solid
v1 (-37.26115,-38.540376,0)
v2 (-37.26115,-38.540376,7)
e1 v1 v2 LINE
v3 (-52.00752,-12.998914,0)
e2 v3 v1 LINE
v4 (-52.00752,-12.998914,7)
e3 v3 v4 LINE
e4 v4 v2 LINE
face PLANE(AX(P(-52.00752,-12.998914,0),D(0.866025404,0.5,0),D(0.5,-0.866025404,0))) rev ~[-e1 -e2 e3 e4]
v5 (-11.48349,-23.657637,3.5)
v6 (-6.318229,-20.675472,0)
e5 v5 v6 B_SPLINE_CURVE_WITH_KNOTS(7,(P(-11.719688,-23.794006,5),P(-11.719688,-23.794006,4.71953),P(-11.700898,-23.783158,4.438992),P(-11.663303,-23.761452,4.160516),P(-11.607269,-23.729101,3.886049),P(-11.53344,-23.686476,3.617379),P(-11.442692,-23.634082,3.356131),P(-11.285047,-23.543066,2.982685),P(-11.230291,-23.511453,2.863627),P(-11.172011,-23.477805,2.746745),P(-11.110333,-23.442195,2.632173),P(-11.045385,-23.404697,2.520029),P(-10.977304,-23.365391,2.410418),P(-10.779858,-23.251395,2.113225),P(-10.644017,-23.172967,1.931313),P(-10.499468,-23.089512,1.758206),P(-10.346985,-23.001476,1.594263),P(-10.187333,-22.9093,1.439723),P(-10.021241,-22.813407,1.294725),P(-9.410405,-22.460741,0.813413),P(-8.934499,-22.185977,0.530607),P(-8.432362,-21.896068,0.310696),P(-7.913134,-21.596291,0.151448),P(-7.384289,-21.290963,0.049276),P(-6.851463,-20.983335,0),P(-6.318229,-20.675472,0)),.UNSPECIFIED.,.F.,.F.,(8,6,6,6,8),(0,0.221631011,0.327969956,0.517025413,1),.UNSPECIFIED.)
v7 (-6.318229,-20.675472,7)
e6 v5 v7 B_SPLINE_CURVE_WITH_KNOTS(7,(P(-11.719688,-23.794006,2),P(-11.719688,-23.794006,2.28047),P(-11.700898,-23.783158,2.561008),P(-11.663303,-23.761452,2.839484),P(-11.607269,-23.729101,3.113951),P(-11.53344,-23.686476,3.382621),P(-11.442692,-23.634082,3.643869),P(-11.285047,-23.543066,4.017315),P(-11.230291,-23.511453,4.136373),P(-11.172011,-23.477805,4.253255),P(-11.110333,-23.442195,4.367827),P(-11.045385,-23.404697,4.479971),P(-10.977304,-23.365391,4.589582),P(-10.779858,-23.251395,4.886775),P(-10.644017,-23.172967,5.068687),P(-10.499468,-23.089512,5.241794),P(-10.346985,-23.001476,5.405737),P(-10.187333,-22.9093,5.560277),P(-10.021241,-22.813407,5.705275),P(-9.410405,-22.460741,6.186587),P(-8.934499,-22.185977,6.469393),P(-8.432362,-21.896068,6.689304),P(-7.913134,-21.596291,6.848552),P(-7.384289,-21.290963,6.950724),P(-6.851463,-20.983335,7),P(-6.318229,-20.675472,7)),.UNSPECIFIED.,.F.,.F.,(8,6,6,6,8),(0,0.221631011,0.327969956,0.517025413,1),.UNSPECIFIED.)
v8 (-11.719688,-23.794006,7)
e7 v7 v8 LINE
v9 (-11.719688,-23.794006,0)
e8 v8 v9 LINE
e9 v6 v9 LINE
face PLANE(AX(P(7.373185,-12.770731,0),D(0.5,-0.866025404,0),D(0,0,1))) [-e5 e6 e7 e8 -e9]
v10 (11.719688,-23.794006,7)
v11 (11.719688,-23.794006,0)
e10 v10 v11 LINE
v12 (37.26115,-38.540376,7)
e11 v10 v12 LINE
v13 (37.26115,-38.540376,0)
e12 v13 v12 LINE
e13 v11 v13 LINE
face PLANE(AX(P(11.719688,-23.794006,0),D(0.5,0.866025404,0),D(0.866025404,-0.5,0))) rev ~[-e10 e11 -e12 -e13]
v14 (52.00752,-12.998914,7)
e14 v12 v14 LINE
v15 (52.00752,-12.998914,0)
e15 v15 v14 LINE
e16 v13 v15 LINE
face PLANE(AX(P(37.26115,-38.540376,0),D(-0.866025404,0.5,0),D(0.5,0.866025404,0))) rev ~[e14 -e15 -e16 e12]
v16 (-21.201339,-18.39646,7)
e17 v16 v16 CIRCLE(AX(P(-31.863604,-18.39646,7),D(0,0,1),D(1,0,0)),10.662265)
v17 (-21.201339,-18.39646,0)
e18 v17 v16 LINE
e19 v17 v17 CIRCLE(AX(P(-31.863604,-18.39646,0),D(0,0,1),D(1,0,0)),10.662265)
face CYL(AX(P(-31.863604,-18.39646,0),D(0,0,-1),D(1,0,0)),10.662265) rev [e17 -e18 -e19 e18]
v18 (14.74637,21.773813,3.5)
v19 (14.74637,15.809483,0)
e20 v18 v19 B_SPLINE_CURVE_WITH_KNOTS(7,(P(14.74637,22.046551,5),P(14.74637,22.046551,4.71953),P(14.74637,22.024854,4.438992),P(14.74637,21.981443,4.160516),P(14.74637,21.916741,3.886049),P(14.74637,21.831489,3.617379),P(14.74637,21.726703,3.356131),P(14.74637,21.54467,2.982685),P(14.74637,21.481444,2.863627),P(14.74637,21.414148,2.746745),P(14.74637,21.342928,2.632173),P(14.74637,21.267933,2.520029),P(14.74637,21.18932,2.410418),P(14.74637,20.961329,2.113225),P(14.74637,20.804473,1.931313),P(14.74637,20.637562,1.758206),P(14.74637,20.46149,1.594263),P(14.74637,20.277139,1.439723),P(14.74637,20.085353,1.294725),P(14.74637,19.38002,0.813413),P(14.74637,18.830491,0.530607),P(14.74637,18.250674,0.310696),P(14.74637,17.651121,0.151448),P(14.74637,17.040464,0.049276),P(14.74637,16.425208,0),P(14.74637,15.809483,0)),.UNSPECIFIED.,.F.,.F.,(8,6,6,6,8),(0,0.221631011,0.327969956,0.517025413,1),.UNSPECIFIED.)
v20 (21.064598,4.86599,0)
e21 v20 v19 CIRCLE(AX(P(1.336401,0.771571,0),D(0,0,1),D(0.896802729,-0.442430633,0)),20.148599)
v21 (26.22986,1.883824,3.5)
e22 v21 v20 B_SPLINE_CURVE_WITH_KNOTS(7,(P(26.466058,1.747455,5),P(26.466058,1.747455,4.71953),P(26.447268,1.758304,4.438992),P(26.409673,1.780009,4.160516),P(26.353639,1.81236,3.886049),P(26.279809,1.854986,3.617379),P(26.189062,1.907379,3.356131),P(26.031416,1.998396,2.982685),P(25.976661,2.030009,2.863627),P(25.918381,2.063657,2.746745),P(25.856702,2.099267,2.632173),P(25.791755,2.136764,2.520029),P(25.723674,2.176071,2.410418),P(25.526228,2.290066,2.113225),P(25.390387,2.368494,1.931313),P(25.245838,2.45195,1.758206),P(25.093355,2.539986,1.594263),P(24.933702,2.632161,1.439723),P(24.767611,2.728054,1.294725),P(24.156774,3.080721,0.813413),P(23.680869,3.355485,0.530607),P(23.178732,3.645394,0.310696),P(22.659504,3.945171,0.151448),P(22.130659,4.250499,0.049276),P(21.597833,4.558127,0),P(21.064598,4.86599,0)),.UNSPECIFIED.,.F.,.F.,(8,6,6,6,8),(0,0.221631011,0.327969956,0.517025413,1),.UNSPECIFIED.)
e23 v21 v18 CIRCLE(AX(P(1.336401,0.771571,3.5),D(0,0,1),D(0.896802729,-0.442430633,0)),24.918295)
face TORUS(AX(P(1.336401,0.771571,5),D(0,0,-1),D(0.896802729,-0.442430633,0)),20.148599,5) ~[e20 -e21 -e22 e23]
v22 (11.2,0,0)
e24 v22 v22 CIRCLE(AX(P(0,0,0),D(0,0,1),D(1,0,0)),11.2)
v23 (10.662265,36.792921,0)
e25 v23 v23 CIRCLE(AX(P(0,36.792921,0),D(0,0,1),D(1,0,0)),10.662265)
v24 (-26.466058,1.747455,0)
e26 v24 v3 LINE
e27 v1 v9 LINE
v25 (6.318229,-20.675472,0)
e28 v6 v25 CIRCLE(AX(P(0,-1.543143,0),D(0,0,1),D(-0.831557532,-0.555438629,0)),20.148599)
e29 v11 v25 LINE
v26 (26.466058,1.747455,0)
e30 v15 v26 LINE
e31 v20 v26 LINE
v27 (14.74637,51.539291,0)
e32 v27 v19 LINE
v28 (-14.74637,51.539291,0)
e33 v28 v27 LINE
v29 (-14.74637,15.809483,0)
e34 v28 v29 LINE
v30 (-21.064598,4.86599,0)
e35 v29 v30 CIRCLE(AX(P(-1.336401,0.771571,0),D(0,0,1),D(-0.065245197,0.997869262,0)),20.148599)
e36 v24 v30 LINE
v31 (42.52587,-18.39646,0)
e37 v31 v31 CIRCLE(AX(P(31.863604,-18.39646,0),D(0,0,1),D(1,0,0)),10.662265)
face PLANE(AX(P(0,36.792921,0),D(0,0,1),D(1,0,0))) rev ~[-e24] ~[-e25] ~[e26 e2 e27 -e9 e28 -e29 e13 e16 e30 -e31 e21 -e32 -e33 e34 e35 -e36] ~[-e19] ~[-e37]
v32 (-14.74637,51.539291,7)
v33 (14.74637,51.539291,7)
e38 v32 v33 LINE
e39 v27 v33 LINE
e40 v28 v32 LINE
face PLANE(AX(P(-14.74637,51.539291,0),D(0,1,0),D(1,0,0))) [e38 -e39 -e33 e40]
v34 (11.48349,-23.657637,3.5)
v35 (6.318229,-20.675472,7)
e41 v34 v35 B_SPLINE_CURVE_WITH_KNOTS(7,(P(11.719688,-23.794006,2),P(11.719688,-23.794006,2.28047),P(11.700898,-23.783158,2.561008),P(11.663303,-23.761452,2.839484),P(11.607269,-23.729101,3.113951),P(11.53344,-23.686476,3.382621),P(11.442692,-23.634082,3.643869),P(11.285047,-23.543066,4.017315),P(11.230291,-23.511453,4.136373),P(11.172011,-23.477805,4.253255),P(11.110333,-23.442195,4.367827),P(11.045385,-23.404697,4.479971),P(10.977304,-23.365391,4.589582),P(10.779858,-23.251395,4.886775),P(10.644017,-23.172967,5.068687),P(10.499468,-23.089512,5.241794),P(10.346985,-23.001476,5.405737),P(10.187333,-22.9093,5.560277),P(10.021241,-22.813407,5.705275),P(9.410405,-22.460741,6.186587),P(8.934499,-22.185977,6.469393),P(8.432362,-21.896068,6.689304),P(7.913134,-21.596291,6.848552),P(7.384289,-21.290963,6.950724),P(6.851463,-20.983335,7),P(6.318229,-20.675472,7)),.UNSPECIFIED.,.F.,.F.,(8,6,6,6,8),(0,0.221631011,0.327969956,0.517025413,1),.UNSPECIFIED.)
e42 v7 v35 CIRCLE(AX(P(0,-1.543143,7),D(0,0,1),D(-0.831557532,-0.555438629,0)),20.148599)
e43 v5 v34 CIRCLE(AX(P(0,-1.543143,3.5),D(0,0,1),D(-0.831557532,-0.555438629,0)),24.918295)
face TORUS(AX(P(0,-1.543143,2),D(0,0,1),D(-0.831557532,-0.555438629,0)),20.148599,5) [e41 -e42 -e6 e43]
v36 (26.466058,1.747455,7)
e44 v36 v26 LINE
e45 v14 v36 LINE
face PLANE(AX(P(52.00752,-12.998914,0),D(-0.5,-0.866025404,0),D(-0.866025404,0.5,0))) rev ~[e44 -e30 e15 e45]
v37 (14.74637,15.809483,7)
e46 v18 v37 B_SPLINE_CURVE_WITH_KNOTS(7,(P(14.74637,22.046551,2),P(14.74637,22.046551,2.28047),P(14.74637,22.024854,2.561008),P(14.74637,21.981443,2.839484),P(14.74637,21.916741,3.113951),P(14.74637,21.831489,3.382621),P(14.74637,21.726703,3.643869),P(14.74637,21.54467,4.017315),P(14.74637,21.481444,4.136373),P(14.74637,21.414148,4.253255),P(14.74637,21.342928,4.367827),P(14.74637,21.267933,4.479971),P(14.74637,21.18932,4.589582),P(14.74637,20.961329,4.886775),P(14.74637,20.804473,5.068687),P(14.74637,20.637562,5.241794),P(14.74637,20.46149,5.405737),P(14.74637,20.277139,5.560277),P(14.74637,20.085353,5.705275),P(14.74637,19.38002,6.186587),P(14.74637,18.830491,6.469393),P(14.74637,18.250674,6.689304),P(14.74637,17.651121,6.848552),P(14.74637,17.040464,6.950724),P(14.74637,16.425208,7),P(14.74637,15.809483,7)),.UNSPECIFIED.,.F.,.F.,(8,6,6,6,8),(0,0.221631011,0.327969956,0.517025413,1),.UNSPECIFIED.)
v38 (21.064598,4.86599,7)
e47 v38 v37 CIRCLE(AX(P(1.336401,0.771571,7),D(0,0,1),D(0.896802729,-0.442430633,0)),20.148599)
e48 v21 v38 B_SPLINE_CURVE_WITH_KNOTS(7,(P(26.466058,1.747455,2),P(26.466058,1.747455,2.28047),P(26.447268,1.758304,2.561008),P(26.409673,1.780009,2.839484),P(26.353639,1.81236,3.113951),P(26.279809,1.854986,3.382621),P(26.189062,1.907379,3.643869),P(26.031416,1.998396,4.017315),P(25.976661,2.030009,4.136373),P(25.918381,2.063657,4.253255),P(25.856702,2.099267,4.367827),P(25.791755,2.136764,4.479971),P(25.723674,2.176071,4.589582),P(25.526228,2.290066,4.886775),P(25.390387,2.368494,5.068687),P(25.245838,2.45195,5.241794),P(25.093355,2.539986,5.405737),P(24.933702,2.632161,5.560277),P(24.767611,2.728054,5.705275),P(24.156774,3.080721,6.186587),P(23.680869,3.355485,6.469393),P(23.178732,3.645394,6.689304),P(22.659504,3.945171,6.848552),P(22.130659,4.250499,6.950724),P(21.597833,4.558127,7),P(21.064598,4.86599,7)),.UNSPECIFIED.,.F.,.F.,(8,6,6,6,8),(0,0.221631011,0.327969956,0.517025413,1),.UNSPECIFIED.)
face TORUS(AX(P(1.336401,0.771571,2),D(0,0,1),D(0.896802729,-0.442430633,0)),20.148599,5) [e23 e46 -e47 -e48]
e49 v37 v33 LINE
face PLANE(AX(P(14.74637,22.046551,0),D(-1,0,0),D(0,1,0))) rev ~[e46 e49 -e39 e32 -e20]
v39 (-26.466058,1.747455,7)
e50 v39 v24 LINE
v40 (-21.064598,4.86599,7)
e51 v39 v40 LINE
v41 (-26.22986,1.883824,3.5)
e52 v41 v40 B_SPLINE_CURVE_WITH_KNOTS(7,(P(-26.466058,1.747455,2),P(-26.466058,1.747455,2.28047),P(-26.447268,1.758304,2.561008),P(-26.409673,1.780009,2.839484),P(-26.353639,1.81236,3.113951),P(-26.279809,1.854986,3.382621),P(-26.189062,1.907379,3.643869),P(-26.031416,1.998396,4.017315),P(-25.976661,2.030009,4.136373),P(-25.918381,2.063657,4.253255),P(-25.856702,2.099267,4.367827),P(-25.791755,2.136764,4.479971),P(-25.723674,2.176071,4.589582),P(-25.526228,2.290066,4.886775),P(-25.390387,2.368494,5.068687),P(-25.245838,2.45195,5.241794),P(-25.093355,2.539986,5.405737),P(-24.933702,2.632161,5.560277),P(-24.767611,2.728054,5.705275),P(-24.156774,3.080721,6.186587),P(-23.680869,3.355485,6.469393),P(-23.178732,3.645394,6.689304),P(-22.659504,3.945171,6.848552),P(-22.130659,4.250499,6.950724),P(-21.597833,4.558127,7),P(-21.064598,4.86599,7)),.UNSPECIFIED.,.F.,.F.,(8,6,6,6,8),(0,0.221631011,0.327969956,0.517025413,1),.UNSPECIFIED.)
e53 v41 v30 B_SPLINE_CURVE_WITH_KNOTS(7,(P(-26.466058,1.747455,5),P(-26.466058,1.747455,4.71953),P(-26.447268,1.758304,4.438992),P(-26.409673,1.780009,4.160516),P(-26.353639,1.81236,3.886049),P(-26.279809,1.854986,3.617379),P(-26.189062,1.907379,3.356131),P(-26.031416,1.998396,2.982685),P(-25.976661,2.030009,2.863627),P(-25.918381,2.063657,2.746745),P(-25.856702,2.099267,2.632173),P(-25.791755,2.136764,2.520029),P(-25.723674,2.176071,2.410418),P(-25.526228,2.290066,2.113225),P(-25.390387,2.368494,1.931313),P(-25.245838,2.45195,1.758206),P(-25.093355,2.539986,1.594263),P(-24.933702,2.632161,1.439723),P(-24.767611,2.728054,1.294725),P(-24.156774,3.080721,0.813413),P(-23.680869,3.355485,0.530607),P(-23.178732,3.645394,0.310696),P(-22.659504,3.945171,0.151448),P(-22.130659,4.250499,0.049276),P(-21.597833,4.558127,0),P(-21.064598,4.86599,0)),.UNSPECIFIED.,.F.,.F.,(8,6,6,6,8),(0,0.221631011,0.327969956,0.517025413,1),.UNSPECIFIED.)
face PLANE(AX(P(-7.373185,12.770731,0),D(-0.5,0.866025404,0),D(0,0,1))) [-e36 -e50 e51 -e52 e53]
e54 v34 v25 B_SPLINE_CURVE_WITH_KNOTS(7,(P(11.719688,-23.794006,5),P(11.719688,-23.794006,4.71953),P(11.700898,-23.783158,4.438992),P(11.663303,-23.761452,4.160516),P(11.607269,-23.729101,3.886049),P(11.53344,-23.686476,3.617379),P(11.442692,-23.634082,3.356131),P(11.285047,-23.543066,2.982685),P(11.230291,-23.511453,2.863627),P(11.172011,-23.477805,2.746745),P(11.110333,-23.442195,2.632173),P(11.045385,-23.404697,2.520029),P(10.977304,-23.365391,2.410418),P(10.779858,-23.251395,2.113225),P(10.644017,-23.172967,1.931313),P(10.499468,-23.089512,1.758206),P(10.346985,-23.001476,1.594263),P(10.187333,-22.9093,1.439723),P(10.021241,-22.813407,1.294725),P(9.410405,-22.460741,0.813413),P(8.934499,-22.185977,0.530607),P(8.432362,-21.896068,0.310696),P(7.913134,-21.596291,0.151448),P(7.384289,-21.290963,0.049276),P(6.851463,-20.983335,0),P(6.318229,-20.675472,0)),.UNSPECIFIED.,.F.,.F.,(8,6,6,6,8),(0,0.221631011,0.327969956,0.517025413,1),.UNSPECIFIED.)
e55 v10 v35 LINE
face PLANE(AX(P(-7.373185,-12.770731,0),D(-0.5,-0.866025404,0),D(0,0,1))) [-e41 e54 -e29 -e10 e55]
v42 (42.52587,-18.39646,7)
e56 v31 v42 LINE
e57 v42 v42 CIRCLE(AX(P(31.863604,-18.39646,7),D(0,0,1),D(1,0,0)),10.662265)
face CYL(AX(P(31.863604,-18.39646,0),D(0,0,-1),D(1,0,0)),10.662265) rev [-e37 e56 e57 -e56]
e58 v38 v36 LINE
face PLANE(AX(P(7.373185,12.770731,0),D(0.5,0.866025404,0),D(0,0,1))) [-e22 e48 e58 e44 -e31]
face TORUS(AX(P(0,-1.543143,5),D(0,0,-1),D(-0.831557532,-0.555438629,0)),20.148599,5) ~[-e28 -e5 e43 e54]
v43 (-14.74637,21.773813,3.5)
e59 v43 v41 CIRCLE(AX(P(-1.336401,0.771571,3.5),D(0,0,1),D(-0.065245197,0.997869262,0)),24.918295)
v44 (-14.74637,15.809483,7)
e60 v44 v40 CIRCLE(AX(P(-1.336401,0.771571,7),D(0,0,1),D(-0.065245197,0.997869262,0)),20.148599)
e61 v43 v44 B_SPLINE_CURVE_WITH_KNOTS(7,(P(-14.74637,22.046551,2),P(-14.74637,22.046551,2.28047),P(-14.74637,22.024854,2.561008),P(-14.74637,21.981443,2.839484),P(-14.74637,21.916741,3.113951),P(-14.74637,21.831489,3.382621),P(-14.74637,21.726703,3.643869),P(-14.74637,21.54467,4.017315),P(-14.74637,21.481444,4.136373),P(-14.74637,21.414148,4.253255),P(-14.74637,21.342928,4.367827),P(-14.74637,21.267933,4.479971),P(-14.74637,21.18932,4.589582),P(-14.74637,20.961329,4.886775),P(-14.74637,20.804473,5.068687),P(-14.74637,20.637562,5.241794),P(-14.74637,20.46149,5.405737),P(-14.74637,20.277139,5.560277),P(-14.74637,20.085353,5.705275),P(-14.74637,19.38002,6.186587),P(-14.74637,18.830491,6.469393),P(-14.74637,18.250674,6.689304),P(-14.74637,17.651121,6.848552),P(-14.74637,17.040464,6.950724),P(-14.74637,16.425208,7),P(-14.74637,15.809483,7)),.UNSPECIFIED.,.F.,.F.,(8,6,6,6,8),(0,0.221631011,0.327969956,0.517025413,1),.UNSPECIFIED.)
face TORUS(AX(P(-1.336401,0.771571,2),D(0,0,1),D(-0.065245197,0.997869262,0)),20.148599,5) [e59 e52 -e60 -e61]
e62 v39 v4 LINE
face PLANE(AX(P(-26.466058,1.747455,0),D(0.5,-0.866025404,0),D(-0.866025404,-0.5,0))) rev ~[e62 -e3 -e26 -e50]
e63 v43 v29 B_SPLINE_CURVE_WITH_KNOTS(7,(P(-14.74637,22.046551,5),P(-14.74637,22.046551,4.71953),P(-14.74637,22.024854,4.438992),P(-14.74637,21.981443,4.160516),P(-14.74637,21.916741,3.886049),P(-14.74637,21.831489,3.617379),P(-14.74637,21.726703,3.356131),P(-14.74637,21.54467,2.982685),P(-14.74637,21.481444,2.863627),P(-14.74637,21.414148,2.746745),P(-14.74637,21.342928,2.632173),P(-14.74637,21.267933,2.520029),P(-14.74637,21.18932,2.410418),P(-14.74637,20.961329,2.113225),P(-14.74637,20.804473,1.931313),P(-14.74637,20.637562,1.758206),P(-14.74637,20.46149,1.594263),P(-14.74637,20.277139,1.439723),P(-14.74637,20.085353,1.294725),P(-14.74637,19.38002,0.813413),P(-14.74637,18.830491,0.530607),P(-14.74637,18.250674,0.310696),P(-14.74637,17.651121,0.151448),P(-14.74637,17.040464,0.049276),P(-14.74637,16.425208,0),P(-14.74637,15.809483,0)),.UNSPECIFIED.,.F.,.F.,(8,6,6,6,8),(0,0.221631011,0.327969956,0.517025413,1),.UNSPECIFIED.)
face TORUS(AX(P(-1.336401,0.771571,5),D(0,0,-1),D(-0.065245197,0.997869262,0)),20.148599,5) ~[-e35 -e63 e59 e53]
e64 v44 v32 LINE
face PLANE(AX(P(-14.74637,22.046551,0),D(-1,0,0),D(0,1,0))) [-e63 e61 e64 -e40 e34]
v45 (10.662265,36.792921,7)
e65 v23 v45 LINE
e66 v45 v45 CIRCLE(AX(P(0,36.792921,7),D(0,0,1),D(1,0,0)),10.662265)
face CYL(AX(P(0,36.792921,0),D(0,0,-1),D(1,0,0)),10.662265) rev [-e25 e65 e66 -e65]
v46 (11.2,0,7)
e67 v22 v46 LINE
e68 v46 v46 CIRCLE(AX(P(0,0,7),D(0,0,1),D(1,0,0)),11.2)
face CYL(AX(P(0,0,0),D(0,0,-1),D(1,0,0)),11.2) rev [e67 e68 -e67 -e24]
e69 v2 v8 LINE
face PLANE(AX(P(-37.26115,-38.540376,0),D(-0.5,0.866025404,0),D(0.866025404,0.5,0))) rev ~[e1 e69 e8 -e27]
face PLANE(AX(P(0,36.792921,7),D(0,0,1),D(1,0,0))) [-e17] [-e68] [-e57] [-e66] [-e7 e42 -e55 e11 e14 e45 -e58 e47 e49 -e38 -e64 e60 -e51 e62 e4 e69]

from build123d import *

# Parameters (mm, degrees)
F0_W         = 29.492739588
F0_H         = 29.492739588
F0_R         = 10.6622653611
F0_R_2       = 13.2
F0_R_3       = 11.2
F1_DEPTH     = 7
F2_T4_ANGLE  = 112.5181364767
F2_T10_ANGLE = 112.5181364767
F2_T16_ANGLE = 112.5181364767
F2_T22_ANGLE = 112.5181364767
F2_T28_ANGLE = 112.5181364767
F2_T34_ANGLE = 112.5181364767


# Not quite as in the source:
# - a fillet or chamfer that OpenCascade refuses, or shapes differently, is made with other operations: its cross-section is extruded or revolved along the edge and cut away or added


with BuildPart() as f1:
    # F0 (on Top) → F1 (new body)
    with BuildSketch(Plane.XY):
        with Locations((0, 36.7929209024)):
            Rectangle(F0_W, F0_H)
        with Locations((0, 36.7929209024)):
            Circle(F0_R, mode=Mode.SUBTRACT)
        with BuildLine():
            Line((14.746369794, 22.0465511084), (-14.746369794, 22.0465511084))
            ThreePointArc((-14.746369794, 22.0465511084), (-23.115726428, 13.3458708757), (-26.4660582227, 1.747455301))
            Line((-26.4660582227, 1.747455301), (-11.7196884287, -23.7940064094))
            ThreePointArc((-11.7196884287, -23.7940064094), (0, -26.6917417515), (11.7196884287, -23.7940064094))
            Line((11.7196884287, -23.7940064094), (26.4660582227, 1.747455301))
            ThreePointArc((26.4660582227, 1.747455301), (23.115726428, 13.3458708757), (14.746369794, 22.0465511084))
        make_face()
        Circle(F0_R_2, mode=Mode.SUBTRACT)
        Polygon((52.0075199331, -12.998914493), (26.4660582227, 1.747455301), (11.7196884287, -23.7940064094), (37.2611501391, -38.5403762034), align=None)
        with Locations((31.8636041809, -18.3964604512)):
            Circle(F0_R, mode=Mode.SUBTRACT)
        Polygon((-11.7196884287, -23.7940064094), (-26.4660582227, 1.747455301), (-52.0075199331, -12.998914493), (-37.2611501391, -38.5403762034), align=None)
        with Locations((-31.8636041809, -18.3964604512)):
            Circle(F0_R, mode=Mode.SUBTRACT)
        Circle(F0_R_2)
        Circle(F0_R_3, mode=Mode.SUBTRACT)
    extrude(amount=F1_DEPTH)

    # F2: fillet of radius 5 on 6 edges, made by hand


with BuildPart() as f2_tool2:
    # F2_s3 → F2_t4 (revolve)
    with BuildSketch(Plane(origin=(-1.2804779727, -0.0837234298, 0), x_dir=(0, 0, 1), z_dir=(0.9978692621, 0.0652451967, 0))):
        with BuildLine():
            ThreePointArc((2, -26.0057199962), (5.5355339059, -24.5412539021), (7, -21.0057199962))
            Line((7, -21.0057199962), (7, -26.0057199962))
            Line((7, -26.0057199962), (2, -26.0057199962))
        make_face()
    revolve(axis=Axis((-1.336401015, 0.7715714858, 7), (0, 0, 1)), revolution_arc=F2_T4_ANGLE)

    split(bisect_by=Plane.YZ.offset(-14.746369794), keep=Keep.BOTTOM)

    split(bisect_by=Plane(origin=(-7.373184897, 12.7707308552, 0), x_dir=(0, 0, 1), z_dir=(-0.5, 0.8660254038, 0)), keep=Keep.TOP)


with BuildPart() as f1_1:
    add(f1.part)

    # F2_t1: cut F2_tool2
    add(f2_tool2.part, mode=Mode.SUBTRACT)


with BuildPart() as f2_tool8:
    # F2_s9 → F2_t10 (revolve)
    with BuildSketch(Plane(origin=(0.5677323692, 1.1507881683, 0), x_dir=(0, 0, 1), z_dir=(-0.4424306333, -0.896802729, 0))):
        with BuildLine():
            ThreePointArc((2, -26.0057199962), (5.5355339059, -24.5412539021), (7, -21.0057199962))
            Line((7, -21.0057199962), (7, -26.0057199962))
            Line((7, -26.0057199962), (2, -26.0057199962))
        make_face()
    revolve(axis=Axis((1.336401015, 0.7715714858, 7), (0, 0, 1)), revolution_arc=F2_T10_ANGLE)

    split(bisect_by=Plane(origin=(7.373184897, 12.7707308552, 0), x_dir=(0, 0, 1), z_dir=(0.5, 0.8660254038, 0)), keep=Keep.TOP)

    split(bisect_by=Plane.YZ.offset(14.746369794), keep=Keep.TOP)


with BuildPart() as f1_2:
    add(f1_1.part)

    # F2_t7: cut F2_tool8
    add(f2_tool8.part, mode=Mode.SUBTRACT)


with BuildPart() as f2_tool14:
    # F2_s15 → F2_t16 (revolve)
    with BuildSketch(Plane(origin=(0.7127456035, -1.0670647384, 0), x_dir=(0, 0, 1), z_dir=(-0.5554386289, 0.8315575323, 0))):
        with BuildLine():
            ThreePointArc((2, -26.0057199962), (5.5355339059, -24.5412539021), (7, -21.0057199962))
            Line((7, -21.0057199962), (7, -26.0057199962))
            Line((7, -26.0057199962), (2, -26.0057199962))
        make_face()
    revolve(axis=Axis((0, -1.5431429715, 7), (0, 0, 1)), revolution_arc=F2_T16_ANGLE)

    split(bisect_by=Plane(origin=(7.373184897, -12.7707308552, 0), x_dir=(0, 0, 1), z_dir=(0.5, -0.8660254038, 0)), keep=Keep.TOP)

    split(bisect_by=Plane(origin=(-7.373184897, -12.7707308552, 0), x_dir=(0, 0, 1), z_dir=(-0.5, -0.8660254038, 0)), keep=Keep.TOP)


with BuildPart() as f1_3:
    add(f1_2.part)

    # F2_t13: cut F2_tool14
    add(f2_tool14.part, mode=Mode.SUBTRACT)


with BuildPart() as f2_tool20:
    # F2_s21 → F2_t22 (revolve)
    with BuildSketch(Plane(origin=(0.5677323692, 1.1507881683, 0), x_dir=(0, 0, 1), z_dir=(-0.4424306333, -0.896802729, 0))):
        with BuildLine():
            ThreePointArc((5, -26.0057199962), (1.4644660941, -24.5412539021), (0, -21.0057199962))
            Line((0, -21.0057199962), (0, -26.0057199962))
            Line((0, -26.0057199962), (5, -26.0057199962))
        make_face()
    revolve(axis=Axis((1.336401015, 0.7715714858, 0), (0, 0, 1)), revolution_arc=F2_T22_ANGLE)

    split(bisect_by=Plane(origin=(7.373184897, 12.7707308552, 0), x_dir=(0, 0, 1), z_dir=(0.5, 0.8660254038, 0)), keep=Keep.TOP)

    split(bisect_by=Plane.YZ.offset(14.746369794), keep=Keep.TOP)


with BuildPart() as f1_4:
    add(f1_3.part)

    # F2_t19: cut F2_tool20
    add(f2_tool20.part, mode=Mode.SUBTRACT)


with BuildPart() as f2_tool26:
    # F2_s27 → F2_t28 (revolve)
    with BuildSketch(Plane(origin=(0.7127456035, -1.0670647384, 0), x_dir=(0, 0, 1), z_dir=(-0.5554386289, 0.8315575323, 0))):
        with BuildLine():
            ThreePointArc((5, -26.0057199962), (1.4644660941, -24.5412539021), (0, -21.0057199962))
            Line((0, -21.0057199962), (0, -26.0057199962))
            Line((0, -26.0057199962), (5, -26.0057199962))
        make_face()
    revolve(axis=Axis((0, -1.5431429715, 0), (0, 0, 1)), revolution_arc=F2_T28_ANGLE)

    split(bisect_by=Plane(origin=(7.373184897, -12.7707308552, 0), x_dir=(0, 0, 1), z_dir=(0.5, -0.8660254038, 0)), keep=Keep.TOP)

    split(bisect_by=Plane(origin=(-7.373184897, -12.7707308552, 0), x_dir=(0, 0, 1), z_dir=(-0.5, -0.8660254038, 0)), keep=Keep.TOP)


with BuildPart() as f1_5:
    add(f1_4.part)

    # F2_t25: cut F2_tool26
    add(f2_tool26.part, mode=Mode.SUBTRACT)


with BuildPart() as f2_tool32:
    # F2_s33 → F2_t34 (revolve)
    with BuildSketch(Plane(origin=(-1.2804779727, -0.0837234298, 0), x_dir=(0, 0, 1), z_dir=(0.9978692621, 0.0652451967, 0))):
        with BuildLine():
            ThreePointArc((5, -26.0057199962), (1.4644660941, -24.5412539021), (0, -21.0057199962))
            Line((0, -21.0057199962), (0, -26.0057199962))
            Line((0, -26.0057199962), (5, -26.0057199962))
        make_face()
    revolve(axis=Axis((-1.336401015, 0.7715714858, 0), (0, 0, 1)), revolution_arc=F2_T34_ANGLE)

    split(bisect_by=Plane.YZ.offset(-14.746369794), keep=Keep.BOTTOM)

    split(bisect_by=Plane(origin=(-7.373184897, 12.7707308552, 0), x_dir=(0, 0, 1), z_dir=(-0.5, 0.8660254038, 0)), keep=Keep.TOP)


with BuildPart() as f1_6:
    add(f1_5.part)

    # F2_t31: cut F2_tool32
    add(f2_tool32.part, mode=Mode.SUBTRACT)


solid = f1_6.part
